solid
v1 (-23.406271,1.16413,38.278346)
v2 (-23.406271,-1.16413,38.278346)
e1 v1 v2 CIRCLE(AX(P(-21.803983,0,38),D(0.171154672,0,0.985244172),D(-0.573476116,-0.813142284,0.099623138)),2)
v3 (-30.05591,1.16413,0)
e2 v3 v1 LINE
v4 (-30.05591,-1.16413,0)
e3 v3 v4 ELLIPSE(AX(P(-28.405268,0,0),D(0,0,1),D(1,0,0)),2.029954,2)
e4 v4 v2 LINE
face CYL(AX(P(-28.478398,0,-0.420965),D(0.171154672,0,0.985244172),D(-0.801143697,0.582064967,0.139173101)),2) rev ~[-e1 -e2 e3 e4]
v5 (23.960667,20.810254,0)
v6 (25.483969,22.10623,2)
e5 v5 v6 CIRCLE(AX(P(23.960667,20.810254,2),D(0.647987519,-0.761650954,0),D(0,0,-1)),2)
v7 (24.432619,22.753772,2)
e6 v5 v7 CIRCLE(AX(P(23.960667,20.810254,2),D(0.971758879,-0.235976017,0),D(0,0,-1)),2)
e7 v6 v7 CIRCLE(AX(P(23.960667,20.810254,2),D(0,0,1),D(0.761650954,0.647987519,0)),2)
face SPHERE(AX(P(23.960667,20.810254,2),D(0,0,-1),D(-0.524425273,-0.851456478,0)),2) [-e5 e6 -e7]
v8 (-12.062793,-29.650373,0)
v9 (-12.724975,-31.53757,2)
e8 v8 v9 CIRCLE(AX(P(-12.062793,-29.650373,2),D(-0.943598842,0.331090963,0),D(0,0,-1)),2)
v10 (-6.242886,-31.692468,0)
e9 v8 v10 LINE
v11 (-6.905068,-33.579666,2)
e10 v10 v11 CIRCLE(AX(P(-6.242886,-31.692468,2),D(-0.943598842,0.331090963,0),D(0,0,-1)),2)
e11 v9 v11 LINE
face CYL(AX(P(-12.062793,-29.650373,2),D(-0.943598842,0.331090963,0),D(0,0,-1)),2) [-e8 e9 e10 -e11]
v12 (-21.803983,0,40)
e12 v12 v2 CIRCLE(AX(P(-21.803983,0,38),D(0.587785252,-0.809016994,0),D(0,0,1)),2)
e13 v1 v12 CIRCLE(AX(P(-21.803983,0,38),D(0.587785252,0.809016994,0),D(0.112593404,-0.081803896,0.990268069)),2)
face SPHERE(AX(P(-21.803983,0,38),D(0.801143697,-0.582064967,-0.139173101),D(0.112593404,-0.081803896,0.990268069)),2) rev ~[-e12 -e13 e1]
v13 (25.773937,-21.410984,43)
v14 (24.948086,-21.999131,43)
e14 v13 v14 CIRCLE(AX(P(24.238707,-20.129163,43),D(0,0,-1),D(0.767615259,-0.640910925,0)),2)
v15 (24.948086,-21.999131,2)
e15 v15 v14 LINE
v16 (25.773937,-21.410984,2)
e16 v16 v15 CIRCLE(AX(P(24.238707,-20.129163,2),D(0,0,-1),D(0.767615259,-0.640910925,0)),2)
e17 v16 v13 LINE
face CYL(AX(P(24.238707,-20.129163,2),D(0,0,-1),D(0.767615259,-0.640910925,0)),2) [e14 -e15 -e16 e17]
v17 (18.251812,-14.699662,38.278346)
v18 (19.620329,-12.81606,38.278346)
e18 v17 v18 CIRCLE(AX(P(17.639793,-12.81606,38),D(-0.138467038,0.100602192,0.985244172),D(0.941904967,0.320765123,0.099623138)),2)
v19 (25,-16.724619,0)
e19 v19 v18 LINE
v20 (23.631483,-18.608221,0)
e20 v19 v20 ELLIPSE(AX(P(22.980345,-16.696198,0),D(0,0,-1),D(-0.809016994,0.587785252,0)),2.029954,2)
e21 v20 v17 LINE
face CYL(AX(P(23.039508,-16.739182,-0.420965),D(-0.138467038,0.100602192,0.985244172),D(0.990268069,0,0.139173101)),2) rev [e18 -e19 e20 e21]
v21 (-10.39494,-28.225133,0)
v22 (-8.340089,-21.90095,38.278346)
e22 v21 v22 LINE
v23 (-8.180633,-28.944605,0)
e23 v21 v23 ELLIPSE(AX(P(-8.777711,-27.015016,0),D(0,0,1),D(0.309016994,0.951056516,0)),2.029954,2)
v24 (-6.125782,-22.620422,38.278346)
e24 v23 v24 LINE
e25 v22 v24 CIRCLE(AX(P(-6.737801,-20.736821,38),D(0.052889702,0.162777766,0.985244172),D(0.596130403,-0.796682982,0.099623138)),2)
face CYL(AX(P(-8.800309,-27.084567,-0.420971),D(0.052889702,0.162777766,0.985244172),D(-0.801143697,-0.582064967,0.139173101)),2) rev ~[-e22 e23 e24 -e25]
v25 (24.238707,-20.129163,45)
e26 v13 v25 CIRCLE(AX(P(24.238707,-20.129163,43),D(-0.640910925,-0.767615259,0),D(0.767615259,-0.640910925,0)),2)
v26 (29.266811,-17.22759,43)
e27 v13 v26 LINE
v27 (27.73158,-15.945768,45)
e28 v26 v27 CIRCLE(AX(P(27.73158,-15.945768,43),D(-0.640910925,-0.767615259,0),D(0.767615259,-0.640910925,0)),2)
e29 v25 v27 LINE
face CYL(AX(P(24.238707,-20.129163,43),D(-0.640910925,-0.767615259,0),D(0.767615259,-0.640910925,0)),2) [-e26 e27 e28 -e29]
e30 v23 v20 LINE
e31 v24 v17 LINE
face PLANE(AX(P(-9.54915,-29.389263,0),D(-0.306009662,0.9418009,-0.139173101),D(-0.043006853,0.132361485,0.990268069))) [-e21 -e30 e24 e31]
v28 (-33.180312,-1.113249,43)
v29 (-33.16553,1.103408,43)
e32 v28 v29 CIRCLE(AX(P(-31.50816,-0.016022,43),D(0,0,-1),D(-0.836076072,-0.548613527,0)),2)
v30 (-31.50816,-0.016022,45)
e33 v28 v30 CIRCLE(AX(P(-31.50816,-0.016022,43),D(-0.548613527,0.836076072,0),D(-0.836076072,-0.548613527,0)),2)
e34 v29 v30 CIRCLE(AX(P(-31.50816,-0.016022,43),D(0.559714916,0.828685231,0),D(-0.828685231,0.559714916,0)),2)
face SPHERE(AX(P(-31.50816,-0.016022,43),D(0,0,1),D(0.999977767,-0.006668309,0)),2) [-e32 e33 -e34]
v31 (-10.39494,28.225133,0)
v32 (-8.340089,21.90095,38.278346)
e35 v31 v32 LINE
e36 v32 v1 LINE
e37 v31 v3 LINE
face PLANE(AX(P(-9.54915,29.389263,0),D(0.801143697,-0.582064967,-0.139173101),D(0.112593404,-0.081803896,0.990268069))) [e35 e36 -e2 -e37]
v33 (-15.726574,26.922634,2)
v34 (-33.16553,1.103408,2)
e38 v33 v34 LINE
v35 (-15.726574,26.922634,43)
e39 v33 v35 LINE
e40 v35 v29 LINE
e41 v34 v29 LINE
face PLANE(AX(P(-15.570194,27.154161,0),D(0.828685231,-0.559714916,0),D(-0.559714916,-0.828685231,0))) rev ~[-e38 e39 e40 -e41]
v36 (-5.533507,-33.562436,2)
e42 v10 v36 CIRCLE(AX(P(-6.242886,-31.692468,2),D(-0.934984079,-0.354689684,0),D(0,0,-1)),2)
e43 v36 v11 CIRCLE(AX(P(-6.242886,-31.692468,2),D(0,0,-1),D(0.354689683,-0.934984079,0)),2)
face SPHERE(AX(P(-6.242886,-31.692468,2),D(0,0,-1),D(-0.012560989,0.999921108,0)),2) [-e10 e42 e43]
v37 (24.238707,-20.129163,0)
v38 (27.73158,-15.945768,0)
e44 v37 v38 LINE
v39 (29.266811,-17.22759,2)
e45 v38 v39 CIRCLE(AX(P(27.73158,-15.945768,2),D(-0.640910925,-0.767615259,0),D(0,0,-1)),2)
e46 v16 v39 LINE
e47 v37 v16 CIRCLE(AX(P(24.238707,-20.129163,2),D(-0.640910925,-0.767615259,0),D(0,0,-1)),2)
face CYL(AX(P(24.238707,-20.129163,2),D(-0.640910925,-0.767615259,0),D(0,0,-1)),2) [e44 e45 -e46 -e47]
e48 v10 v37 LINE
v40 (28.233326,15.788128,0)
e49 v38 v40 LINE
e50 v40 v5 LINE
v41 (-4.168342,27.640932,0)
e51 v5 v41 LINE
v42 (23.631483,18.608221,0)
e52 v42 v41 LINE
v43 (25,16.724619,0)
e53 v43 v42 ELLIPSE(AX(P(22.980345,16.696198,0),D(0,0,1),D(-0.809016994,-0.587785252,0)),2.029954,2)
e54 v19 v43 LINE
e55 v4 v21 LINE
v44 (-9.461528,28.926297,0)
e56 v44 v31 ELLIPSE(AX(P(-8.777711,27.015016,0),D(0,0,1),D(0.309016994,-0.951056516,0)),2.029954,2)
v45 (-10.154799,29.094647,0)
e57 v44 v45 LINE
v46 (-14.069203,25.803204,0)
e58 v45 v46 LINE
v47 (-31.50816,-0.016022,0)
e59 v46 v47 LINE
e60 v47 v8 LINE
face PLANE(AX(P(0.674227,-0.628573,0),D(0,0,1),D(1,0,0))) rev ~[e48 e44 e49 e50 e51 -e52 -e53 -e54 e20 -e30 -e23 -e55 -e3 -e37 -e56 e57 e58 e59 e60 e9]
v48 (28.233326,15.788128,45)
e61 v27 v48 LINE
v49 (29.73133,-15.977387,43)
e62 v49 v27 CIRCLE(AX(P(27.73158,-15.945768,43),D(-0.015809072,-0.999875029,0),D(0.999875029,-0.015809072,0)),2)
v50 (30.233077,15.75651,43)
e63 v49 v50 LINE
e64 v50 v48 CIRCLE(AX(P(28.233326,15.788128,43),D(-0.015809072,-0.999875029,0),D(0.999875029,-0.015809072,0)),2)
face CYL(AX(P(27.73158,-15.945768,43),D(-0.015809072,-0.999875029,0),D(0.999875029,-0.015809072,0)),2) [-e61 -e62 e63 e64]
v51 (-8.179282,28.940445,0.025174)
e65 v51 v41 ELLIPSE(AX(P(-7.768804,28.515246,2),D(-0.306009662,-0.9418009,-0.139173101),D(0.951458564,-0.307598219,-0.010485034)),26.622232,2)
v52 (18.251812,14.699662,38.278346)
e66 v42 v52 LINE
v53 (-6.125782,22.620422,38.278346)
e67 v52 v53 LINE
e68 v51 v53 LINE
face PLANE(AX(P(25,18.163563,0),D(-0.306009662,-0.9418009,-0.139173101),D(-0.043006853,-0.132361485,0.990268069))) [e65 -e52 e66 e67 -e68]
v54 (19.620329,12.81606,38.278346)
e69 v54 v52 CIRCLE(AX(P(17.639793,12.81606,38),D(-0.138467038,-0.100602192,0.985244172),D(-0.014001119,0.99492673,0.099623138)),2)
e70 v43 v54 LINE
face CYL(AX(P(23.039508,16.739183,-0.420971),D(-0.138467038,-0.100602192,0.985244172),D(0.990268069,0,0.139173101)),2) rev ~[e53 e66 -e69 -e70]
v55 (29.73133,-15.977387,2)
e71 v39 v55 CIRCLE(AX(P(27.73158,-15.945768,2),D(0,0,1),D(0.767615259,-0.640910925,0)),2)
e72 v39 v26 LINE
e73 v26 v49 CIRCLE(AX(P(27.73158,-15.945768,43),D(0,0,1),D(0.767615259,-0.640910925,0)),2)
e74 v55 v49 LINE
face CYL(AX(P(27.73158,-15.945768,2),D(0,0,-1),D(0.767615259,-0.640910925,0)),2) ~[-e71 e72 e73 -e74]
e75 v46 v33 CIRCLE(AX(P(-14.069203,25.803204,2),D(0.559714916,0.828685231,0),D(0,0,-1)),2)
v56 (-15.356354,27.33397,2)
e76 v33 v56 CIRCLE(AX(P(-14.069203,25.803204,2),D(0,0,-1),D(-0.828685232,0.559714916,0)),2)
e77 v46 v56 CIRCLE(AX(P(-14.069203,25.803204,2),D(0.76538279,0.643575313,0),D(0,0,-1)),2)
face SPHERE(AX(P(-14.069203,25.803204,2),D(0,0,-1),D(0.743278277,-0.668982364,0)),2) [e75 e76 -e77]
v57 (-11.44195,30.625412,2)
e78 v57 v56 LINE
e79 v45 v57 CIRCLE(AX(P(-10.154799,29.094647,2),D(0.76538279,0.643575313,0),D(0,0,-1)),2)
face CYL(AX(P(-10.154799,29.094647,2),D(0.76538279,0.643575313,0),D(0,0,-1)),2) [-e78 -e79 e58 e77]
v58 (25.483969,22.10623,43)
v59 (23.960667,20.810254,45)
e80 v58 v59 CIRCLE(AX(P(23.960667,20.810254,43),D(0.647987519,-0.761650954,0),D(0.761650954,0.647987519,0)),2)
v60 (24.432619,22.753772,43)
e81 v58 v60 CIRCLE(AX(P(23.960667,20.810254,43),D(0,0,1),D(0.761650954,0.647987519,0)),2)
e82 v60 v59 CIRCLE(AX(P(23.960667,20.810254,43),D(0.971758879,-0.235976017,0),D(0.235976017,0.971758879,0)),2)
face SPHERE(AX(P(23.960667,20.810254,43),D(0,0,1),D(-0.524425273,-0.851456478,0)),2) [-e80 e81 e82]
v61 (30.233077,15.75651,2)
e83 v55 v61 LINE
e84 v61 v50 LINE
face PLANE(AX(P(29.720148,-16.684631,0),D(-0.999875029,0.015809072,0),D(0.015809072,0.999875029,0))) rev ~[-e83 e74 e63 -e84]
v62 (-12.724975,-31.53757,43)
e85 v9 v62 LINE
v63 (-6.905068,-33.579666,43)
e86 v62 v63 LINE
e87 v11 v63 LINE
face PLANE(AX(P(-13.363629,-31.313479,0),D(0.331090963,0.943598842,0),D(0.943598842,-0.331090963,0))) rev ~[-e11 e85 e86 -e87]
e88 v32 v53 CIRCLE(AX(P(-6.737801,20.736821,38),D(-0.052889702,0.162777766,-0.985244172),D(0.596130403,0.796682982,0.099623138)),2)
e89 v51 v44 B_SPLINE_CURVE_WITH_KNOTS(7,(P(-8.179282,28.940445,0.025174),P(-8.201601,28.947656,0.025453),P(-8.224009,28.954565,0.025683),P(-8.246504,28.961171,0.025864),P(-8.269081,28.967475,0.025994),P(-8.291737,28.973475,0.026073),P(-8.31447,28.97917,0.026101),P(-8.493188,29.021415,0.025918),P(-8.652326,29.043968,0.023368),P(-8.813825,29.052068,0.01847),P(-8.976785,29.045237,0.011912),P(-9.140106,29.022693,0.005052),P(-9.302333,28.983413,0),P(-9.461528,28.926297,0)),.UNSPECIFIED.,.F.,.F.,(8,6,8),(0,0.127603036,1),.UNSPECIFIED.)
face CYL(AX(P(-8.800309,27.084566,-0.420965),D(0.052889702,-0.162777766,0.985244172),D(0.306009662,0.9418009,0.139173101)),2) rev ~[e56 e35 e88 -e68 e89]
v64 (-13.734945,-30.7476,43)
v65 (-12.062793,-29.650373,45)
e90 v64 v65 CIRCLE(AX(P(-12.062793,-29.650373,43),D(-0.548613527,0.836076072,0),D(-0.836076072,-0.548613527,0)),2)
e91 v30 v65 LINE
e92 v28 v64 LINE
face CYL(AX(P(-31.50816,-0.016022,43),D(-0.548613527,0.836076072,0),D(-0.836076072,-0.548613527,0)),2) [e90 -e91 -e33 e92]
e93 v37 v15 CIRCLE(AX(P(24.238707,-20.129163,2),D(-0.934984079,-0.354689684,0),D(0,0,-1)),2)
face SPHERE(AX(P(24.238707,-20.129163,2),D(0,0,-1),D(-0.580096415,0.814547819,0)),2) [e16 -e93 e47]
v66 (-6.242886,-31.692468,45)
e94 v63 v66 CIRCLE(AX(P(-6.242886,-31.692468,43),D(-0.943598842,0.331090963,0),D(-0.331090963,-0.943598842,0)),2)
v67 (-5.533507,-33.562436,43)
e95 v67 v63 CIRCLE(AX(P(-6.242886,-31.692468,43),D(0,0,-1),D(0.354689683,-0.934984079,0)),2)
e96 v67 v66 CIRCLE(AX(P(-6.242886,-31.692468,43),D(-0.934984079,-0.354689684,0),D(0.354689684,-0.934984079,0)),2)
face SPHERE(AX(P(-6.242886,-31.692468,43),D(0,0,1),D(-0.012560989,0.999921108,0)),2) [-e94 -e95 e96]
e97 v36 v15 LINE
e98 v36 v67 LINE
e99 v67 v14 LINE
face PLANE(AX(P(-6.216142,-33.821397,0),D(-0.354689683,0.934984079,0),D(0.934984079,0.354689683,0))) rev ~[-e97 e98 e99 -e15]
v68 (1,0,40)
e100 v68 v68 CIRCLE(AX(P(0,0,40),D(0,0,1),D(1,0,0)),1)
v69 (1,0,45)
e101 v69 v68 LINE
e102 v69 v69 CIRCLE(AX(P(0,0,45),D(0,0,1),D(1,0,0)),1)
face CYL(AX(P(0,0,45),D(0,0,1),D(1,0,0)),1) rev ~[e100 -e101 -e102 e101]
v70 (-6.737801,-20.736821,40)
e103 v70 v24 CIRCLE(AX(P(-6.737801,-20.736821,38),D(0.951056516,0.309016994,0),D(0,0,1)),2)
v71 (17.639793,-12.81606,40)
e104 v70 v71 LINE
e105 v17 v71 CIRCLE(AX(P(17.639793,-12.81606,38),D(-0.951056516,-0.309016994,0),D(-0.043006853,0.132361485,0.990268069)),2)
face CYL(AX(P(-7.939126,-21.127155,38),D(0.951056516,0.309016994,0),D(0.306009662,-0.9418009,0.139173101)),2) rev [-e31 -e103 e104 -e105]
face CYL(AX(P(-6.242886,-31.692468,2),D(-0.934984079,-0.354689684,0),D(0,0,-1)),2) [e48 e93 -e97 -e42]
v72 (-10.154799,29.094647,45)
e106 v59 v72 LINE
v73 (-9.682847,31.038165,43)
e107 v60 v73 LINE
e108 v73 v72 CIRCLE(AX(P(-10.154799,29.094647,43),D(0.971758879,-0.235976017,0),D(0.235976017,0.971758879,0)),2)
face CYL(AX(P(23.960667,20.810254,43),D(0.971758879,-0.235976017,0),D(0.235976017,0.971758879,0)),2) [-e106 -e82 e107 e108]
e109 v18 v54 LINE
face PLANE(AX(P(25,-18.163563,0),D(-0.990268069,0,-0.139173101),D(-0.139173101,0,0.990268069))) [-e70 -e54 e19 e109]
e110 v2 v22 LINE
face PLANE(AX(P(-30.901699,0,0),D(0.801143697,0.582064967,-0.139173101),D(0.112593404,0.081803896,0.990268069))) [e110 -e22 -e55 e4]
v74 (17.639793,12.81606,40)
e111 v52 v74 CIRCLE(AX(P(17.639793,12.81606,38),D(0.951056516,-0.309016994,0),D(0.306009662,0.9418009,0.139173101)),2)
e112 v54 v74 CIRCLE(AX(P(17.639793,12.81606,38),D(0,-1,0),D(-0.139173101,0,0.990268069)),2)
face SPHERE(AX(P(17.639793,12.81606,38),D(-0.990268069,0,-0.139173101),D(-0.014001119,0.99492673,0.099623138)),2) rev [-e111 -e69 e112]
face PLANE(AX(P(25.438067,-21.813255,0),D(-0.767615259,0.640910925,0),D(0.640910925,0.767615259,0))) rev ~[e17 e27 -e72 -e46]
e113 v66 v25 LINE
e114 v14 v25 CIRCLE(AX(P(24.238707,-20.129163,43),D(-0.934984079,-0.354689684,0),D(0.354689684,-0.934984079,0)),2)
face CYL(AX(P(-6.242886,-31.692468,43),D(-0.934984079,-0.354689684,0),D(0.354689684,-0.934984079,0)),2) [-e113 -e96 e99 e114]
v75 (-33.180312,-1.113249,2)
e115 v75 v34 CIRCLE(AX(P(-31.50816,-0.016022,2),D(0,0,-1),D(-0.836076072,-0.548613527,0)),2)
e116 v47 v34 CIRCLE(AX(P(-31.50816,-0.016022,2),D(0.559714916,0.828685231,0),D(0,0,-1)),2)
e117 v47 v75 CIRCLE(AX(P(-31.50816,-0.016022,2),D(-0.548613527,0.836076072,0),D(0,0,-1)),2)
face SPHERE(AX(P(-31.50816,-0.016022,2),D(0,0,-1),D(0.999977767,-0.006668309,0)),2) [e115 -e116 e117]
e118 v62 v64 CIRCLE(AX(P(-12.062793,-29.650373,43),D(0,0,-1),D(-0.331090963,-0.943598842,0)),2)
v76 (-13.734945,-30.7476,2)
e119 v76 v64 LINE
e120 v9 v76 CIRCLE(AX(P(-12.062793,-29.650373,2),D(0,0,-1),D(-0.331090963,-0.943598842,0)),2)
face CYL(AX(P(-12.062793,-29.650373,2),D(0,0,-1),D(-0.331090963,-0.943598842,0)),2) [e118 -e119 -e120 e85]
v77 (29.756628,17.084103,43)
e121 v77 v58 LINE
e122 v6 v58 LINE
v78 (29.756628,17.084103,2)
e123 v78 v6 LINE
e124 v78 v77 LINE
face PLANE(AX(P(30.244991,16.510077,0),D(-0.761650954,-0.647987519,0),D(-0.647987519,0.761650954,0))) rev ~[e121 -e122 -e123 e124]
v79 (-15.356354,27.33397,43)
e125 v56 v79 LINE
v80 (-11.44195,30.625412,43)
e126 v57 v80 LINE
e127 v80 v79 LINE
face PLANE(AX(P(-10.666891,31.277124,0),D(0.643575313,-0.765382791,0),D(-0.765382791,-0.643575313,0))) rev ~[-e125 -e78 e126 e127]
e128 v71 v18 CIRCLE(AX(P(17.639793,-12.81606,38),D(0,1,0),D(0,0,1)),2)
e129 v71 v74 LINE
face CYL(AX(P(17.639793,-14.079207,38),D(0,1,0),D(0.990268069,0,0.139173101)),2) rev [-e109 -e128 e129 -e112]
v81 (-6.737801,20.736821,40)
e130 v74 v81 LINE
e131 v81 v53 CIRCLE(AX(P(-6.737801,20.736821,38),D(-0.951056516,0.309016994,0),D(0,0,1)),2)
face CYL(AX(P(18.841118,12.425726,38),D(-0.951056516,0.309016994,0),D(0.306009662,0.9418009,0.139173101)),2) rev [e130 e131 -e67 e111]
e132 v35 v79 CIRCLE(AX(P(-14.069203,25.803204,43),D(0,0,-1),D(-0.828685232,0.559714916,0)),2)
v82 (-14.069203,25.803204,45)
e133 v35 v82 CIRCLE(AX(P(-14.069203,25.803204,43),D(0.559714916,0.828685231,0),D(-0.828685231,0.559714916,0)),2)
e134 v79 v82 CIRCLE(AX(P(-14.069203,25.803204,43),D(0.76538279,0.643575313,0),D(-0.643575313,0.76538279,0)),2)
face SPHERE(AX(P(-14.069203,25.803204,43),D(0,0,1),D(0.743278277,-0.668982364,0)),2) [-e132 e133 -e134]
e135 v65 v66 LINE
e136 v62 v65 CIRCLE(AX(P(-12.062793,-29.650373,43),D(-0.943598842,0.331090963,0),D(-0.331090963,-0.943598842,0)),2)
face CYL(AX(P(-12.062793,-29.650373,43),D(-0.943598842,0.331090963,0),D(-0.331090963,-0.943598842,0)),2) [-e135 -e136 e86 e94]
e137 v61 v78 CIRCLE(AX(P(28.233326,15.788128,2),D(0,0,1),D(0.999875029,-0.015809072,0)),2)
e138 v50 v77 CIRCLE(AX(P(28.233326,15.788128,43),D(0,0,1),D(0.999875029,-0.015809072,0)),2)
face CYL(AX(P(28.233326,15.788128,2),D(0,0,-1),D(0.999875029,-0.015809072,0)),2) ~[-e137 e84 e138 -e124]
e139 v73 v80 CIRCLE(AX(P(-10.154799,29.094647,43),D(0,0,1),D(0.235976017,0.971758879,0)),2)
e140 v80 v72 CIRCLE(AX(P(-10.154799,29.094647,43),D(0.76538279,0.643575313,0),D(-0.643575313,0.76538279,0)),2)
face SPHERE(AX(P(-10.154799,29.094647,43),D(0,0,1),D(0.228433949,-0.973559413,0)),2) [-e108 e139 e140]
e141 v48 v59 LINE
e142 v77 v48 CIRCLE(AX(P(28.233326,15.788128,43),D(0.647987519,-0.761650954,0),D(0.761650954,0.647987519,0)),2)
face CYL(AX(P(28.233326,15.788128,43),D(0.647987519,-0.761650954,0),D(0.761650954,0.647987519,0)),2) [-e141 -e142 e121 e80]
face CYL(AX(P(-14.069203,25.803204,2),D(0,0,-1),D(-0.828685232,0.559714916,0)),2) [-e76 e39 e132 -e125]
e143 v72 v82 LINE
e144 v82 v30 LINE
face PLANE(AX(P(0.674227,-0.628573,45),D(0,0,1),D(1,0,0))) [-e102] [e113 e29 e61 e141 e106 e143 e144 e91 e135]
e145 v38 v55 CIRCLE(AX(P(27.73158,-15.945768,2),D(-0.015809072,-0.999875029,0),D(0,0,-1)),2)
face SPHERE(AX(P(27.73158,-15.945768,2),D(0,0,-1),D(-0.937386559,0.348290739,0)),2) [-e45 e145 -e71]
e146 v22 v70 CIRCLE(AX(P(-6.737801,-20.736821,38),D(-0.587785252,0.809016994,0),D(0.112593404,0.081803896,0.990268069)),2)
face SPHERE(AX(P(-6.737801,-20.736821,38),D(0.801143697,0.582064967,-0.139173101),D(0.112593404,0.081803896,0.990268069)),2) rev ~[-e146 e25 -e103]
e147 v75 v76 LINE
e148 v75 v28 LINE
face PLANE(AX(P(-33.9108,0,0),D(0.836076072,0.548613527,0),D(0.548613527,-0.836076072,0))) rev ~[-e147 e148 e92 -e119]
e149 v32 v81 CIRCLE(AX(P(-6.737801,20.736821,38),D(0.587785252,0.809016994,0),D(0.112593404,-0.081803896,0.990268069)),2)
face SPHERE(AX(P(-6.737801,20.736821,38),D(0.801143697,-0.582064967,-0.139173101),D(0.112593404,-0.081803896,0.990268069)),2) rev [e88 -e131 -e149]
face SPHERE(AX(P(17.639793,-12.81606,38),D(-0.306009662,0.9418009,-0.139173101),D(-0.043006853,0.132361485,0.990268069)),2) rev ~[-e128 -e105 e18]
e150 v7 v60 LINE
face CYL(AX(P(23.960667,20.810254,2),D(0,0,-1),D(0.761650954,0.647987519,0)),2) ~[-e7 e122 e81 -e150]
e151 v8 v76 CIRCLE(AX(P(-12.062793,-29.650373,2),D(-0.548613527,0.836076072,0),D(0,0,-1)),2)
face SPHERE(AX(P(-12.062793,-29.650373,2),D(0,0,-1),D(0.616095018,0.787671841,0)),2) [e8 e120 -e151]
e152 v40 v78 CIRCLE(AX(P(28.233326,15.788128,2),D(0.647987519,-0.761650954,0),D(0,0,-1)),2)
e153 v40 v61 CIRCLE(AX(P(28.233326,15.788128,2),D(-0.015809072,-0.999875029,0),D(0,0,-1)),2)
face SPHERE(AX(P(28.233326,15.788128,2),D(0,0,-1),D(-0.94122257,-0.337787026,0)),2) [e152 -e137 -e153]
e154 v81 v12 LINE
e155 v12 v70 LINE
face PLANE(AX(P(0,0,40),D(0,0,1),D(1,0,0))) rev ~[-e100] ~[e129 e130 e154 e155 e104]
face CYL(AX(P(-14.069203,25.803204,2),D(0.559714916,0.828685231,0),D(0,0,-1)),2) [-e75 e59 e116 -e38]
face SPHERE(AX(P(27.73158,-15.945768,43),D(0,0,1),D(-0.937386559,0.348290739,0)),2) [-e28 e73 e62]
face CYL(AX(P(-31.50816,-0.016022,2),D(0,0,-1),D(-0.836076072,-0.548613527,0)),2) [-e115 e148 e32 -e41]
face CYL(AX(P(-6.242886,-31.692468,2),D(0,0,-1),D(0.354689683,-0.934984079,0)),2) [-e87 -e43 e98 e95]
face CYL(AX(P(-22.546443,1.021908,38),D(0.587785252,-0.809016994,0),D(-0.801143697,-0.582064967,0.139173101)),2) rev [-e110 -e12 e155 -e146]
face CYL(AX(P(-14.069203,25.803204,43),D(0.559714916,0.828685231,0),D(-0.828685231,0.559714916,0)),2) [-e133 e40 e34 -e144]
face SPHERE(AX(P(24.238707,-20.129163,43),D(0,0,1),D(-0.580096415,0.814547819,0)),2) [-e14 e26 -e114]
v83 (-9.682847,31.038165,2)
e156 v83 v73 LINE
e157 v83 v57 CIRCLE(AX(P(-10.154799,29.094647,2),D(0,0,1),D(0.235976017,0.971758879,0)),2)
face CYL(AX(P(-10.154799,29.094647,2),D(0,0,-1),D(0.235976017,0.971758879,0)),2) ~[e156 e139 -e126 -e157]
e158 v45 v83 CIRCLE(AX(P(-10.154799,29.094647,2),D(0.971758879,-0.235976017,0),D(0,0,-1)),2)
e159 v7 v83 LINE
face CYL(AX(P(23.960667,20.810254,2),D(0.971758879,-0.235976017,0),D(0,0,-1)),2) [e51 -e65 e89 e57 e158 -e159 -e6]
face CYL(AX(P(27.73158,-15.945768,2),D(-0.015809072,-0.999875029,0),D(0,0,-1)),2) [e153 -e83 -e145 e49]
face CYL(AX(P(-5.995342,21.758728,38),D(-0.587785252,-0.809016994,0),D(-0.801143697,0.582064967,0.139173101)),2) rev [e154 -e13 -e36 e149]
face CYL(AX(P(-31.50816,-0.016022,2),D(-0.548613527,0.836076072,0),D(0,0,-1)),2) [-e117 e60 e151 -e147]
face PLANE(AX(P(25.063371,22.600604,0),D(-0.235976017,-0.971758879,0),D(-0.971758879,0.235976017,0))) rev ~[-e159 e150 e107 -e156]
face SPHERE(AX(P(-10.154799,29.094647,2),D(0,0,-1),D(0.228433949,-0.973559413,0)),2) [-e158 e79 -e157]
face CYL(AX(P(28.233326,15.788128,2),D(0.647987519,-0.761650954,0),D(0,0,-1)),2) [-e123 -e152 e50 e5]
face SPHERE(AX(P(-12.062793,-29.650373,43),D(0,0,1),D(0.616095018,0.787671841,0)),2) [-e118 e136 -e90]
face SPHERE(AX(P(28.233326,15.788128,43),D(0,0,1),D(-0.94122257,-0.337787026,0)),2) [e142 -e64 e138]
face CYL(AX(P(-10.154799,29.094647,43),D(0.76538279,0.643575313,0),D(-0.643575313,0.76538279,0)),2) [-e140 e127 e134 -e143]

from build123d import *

# Parameters (mm, degrees)
F1_DEPTH      = 45
F3_DEPTH      = 40
F3_TAPER      = 8
F4_R          = 2
F5_T1_DEPTH   = 41
F5_T3_DEPTH   = 35.1069251356
F5_T5_DEPTH   = 6.5937371539
F5_T7_DEPTH   = 31.737863034
F5_T9_DEPTH   = 5.4498579355
F5_T11_DEPTH  = 32.6011890019
F5_T13_DEPTH  = 6.1677770557
F5_T15_DEPTH  = 35.4445627494
F5_T17_DEPTH  = 31.1568553356
F5_T19_DEPTH  = 5.1143087809
F5_T24_DEPTH  = 2
F5_T30_DEPTH  = 2
F5_T36_DEPTH  = 2
F5_T42_DEPTH  = 2
F5_T48_DEPTH  = 2
F5_T54_DEPTH  = 2
F5_T60_DEPTH  = 2
F5_T66_DEPTH  = 2
F5_T72_DEPTH  = 2
F5_T78_DEPTH  = 2
F5_T84_DEPTH  = 2
F5_T90_DEPTH  = 2
F5_T96_DEPTH  = 2
F5_T102_DEPTH = 2
F5_T108_DEPTH = 2
F5_T114_DEPTH = 2
F5_T120_DEPTH = 2
F5_T126_DEPTH = 2
F6_R          = 1
F7_DEPTH      = 45.0010001


# Not quite as in the source:
# - a fillet or chamfer that OpenCascade refuses, or shapes differently, is made with other operations: its cross-section is extruded or revolved along the edge and cut away or added


with BuildPart() as f1:
    # F0 (on Top) → F1 (new body)
    with BuildSketch(Plane.XY):
        Polygon((29.7201480716, -16.6846308857), (30.2449911833, 16.5100768209), (25.0633712858, 22.6006042212), (-10.6668910012, 31.2771238387), (-15.5701944605, 27.1541606635), (-33.9107997715, 0), (-13.3636286482, -31.3134789467), (-6.2161423266, -33.8213965297), (25.438066572, -21.8132548034), align=None)
    extrude(amount=F1_DEPTH)

    # F2 (on Top) → F3 (cut)
    with BuildSketch(Plane.XY):
        Polygon((25, -18.1635632001), (25, 18.1635632001), (-9.5491502813, 29.3892626146), (-30.9016994375, 0), (-9.5491502813, -29.3892626146), align=None)
    extrude(amount=F3_DEPTH, taper=F3_TAPER, mode=Mode.SUBTRACT)

    # F4
    f4_edges = [f1.edges().sort_by_distance(p)[0] for p in [
        (5.988245, 18.429922, 40),
        (22.189183, 16.121385, 20),
        (19.378367, 0, 40),
        (5.988245, -18.429922, 40),
        (-15.677428, -11.390318, 40),
        (-15.677428, 11.390318, 40),
        (-8.475514, 26.084949, 20.000003),
        (-27.427338, 0, 20.000003),
        (-8.475514, -26.084949, 20),
        (22.189183, -16.121385, 20.000003),
    ]]
    fillet(f4_edges, radius=F4_R)

    # F5: fillet of radius 2 on 27 edges, made by hand

    # F5_s2 → F5_t1 (cut)
    with BuildSketch(Plane.XY.offset(2)):
        with BuildLine():
            ThreePointArc((25.4839689775, 22.1062295244), (25.0095176152, 22.5131674422), (24.4326191036, 22.7537722455))
            Line((24.4326191036, 22.7537722455), (25.0633712858, 22.6006042212))
            Line((25.0633712858, 22.6006042212), (25.4839689775, 22.1062295244))
        make_face()
        with BuildLine():
            ThreePointArc((-9.6828471205, 31.0381646067), (-10.6116670526, 31.0417656744), (-11.4419497811, 30.6254124292))
            Line((-11.4419497811, 30.6254124292), (-10.6668910012, 31.2771238387))
            Line((-10.6668910012, 31.2771238387), (-9.6828471205, 31.0381646067))
        make_face()
        with BuildLine():
            ThreePointArc((30.2330765046, 15.75651015), (30.115771586, 16.4637023449), (29.7566283548, 17.0841033313))
            Line((29.7566283548, 17.0841033313), (30.2449911833, 16.5100768209))
            Line((30.2449911833, 16.5100768209), (30.2330765046, 15.75651015))
        make_face()
        with BuildLine():
            ThreePointArc((29.266810806, -17.2275902721), (29.606353406, -16.6423498995), (29.7313303454, -15.9773865656))
            Line((29.7313303454, -15.9773865656), (29.7201480716, -16.6846308857))
            Line((29.7201480716, -16.6846308857), (29.266810806, -17.2275902721))
        make_face()
        with BuildLine():
            ThreePointArc((25.7739373145, -21.4109843833), (25.3988996269, -21.7582581704), (24.9480861633, -21.9991306915))
            Line((24.9480861633, -21.9991306915), (25.438066572, -21.8132548034))
            Line((25.438066572, -21.8132548034), (25.7739373145, -21.4109843833))
        make_face()
        with BuildLine():
            ThreePointArc((-5.5335065177, -33.5624360999), (-6.217763907, -33.6923101567), (-6.90506781, -33.5796656252))
            Line((-6.90506781, -33.5796656252), (-6.2161423266, -33.8213965297))
            Line((-6.2161423266, -33.8213965297), (-5.5335065177, -33.5624360999))
        make_face()
        with BuildLine():
            ThreePointArc((-12.7249750969, -31.5375703823), (-13.294983208, -31.2257163798), (-13.7349453155, -30.7475997522))
            Line((-13.7349453155, -30.7475997522), (-13.3636286482, -31.3134789467))
            Line((-13.3636286482, -31.3134789467), (-12.7249750969, -31.5375703823))
        make_face()
        with BuildLine():
            ThreePointArc((-33.1803118935, -1.1132489554), (-33.5081152827, -0.0026852842), (-33.1655302123, 1.1034079304))
            Line((-33.1655302123, 1.1034079304), (-33.9107997715, 0))
            Line((-33.9107997715, 0), (-33.1803118935, -1.1132489554))
        make_face()
        with BuildLine():
            ThreePointArc((-15.7265735436, 26.922633804), (-15.5557596342, 27.1411687), (-15.3563537075, 27.3339695529))
            Line((-15.3563537075, 27.3339695529), (-15.5701944605, 27.1541606635))
            Line((-15.5701944605, 27.1541606635), (-15.7265735436, 26.922633804))
        make_face()
    extrude(amount=F5_T1_DEPTH, mode=Mode.SUBTRACT)

    # F5_s4 → F5_t3 (cut)
    with BuildSketch(Plane(origin=(17.8543882754, -4.335651076, 0), x_dir=(0, 0, 1), z_dir=(-0.9717588793, 0.235976017, 0))):
        with BuildLine():
            ThreePointArc((0, 25.8766923562), (0.5857864376, 27.2909059185), (2, 27.8766923562))
            Line((2, 27.8766923562), (0, 27.8766923562))
            Line((0, 27.8766923562), (0, 25.8766923562))
        make_face()
        with BuildLine():
            ThreePointArc((43, 27.8766923562), (44.4142135624, 27.2909059185), (45, 25.8766923562))
            Line((45, 25.8766923562), (45, 27.8766923562))
            Line((45, 27.8766923562), (43, 27.8766923562))
        make_face()
    extrude(amount=F5_T3_DEPTH, mode=Mode.SUBTRACT)

    # F5_s6 → F5_t5 (cut)
    with BuildSketch(Plane(origin=(4.0627522572, -4.775399283, 0), x_dir=(0, 0, 1), z_dir=(-0.6479875187, 0.7616509539, 0))):
        with BuildLine():
            ThreePointArc((0, 31.7344500987), (0.5857864376, 33.1486636611), (2, 33.7344500987))
            Line((2, 33.7344500987), (0, 33.7344500987))
            Line((0, 33.7344500987), (0, 31.7344500987))
        make_face()
        with BuildLine():
            ThreePointArc((43, 33.7344500987), (44.4142135624, 33.1486636611), (45, 31.7344500987))
            Line((45, 31.7344500987), (45, 33.7344500987))
            Line((45, 33.7344500987), (43, 33.7344500987))
        make_face()
    extrude(amount=F5_T5_DEPTH, mode=Mode.SUBTRACT)

    # F5_s8 → F5_t7 (cut)
    with BuildSketch(Plane(origin=(-0.2451254322, -15.5034273892, 0), x_dir=(0, 0, 1), z_dir=(0.0158090719, 0.9998750288, 0))):
        with BuildLine():
            ThreePointArc((0, 27.9802024391), (0.5857864376, 29.3944160014), (2, 29.9802024391))
            Line((2, 29.9802024391), (0, 29.9802024391))
            Line((0, 29.9802024391), (0, 27.9802024391))
        make_face()
        with BuildLine():
            ThreePointArc((43, 29.9802024391), (44.4142135624, 29.3944160014), (45, 27.9802024391))
            Line((45, 27.9802024391), (45, 29.9802024391))
            Line((45, 29.9802024391), (43, 29.9802024391))
        make_face()
    extrude(amount=F5_T7_DEPTH, mode=Mode.SUBTRACT)

    # F5_s10 → F5_t9 (cut)
    with BuildSketch(Plane(origin=(0.0534517688, 0.0640188702, 0), x_dir=(0, 0, 1), z_dir=(0.6409109252, 0.7676152591, 0))):
        with BuildLine():
            ThreePointArc((0, 31.5070013796), (0.5857864376, 32.9212149419), (2, 33.5070013796))
            Line((2, 33.5070013796), (0, 33.5070013796))
            Line((0, 33.5070013796), (0, 31.5070013796))
        make_face()
        with BuildLine():
            ThreePointArc((43, 33.5070013796), (44.4142135624, 32.9212149419), (45, 31.5070013796))
            Line((45, 31.5070013796), (45, 33.5070013796))
            Line((45, 33.5070013796), (43, 33.5070013796))
        make_face()
    extrude(amount=F5_T9_DEPTH, mode=Mode.SUBTRACT)

    # F5_s12 → F5_t11 (cut)
    with BuildSketch(Plane(origin=(-15.9676490674, -6.0573869861, 0), x_dir=(0, 0, 1), z_dir=(0.9349840792, 0.3546896835, 0))):
        with BuildLine():
            ThreePointArc((0, 27.4176657385), (0.5857864376, 28.8318793009), (2, 29.4176657385))
            Line((2, 29.4176657385), (0, 29.4176657385))
            Line((0, 29.4176657385), (0, 27.4176657385))
        make_face()
        with BuildLine():
            ThreePointArc((43, 29.4176657385), (44.4142135624, 28.8318793009), (45, 27.4176657385))
            Line((45, 27.4176657385), (45, 29.4176657385))
            Line((45, 29.4176657385), (43, 29.4176657385))
        make_face()
    extrude(amount=F5_T11_DEPTH, mode=Mode.SUBTRACT)

    # F5_s14 → F5_t13 (cut)
    with BuildSketch(Plane(origin=(-1.477173062, 0.5183120511, 0), x_dir=(0, 0, 1), z_dir=(0.9435988419, -0.3310909627, 0))):
        with BuildLine():
            ThreePointArc((0, 31.9719391439), (0.5857864376, 33.3861527063), (2, 33.9719391439))
            Line((2, 33.9719391439), (0, 33.9719391439))
            Line((0, 33.9719391439), (0, 31.9719391439))
        make_face()
        with BuildLine():
            ThreePointArc((43, 33.9719391439), (44.4142135624, 33.3861527063), (45, 31.9719391439))
            Line((45, 31.9719391439), (45, 33.9719391439))
            Line((45, 33.9719391439), (43, 33.9719391439))
        make_face()
    extrude(amount=F5_T13_DEPTH, mode=Mode.SUBTRACT)

    # F5_s16 → F5_t15 (cut)
    with BuildSketch(Plane(origin=(-9.4758761855, 14.4410462956, 0), x_dir=(0, 0, 1), z_dir=(0.5486135269, -0.836076072, 0))):
        with BuildLine():
            ThreePointArc((0, 26.3520082709), (0.5857864376, 27.7662218332), (2, 28.3520082709))
            Line((2, 28.3520082709), (0, 28.3520082709))
            Line((0, 28.3520082709), (0, 26.3520082709))
        make_face()
        with BuildLine():
            ThreePointArc((43, 28.3520082709), (44.4142135624, 27.7662218332), (45, 26.3520082709))
            Line((45, 26.3520082709), (45, 28.3520082709))
            Line((45, 28.3520082709), (43, 28.3520082709))
        make_face()
    extrude(amount=F5_T15_DEPTH, mode=Mode.SUBTRACT)

    # F5_s18 → F5_t17 (cut)
    with BuildSketch(Plane(origin=(7.5606241791, 11.1938728407, 0), x_dir=(0, 0, 1), z_dir=(-0.5597149161, -0.8286852314, 0))):
        with BuildLine():
            ThreePointArc((0, 26.1013789558), (0.5857864376, 27.5155925181), (2, 28.1013789558))
            Line((2, 28.1013789558), (0, 28.1013789558))
            Line((0, 28.1013789558), (0, 26.1013789558))
        make_face()
        with BuildLine():
            ThreePointArc((43, 28.1013789558), (44.4142135624, 27.5155925181), (45, 26.1013789558))
            Line((45, 26.1013789558), (45, 28.1013789558))
            Line((45, 28.1013789558), (43, 28.1013789558))
        make_face()
    extrude(amount=F5_T17_DEPTH, mode=Mode.SUBTRACT)

    # F5_s20 → F5_t19 (cut)
    with BuildSketch(Plane(origin=(8.3826927124, 7.0486221481, 0), x_dir=(0, 0, 1), z_dir=(-0.7653827905, -0.6435753134, 0))):
        with BuildLine():
            ThreePointArc((0, 28.803920042), (0.5857864376, 30.2181336044), (2, 30.803920042))
            Line((2, 30.803920042), (0, 30.803920042))
            Line((0, 30.803920042), (0, 28.803920042))
        make_face()
        with BuildLine():
            ThreePointArc((43, 30.803920042), (44.4142135624, 30.2181336044), (45, 28.803920042))
            Line((45, 28.803920042), (45, 30.803920042))
            Line((45, 30.803920042), (43, 30.803920042))
        make_face()
    extrude(amount=F5_T19_DEPTH, mode=Mode.SUBTRACT)


with BuildPart() as f5_tool22:
    # F5_s23 → F5_t24 (new body)
    with BuildSketch(Plane.XY.offset(2)):
        Polygon((23.9606670696, 20.810254487), (24.4326191036, 22.7537722455), (25.0633712858, 22.6006042212), (25.4839689775, 22.1062295244), align=None)
    extrude(amount=-F5_T24_DEPTH)

    # F5_s25 → F5_t26 (revolve, cut)
    with BuildSketch(Plane(origin=(23.9606670696, 20.810254487, 2), x_dir=(-0.5244252728, -0.8514564776, 0), z_dir=(0.8514564776, -0.5244252728, 0))):
        with BuildLine():
            ThreePointArc((0, -2), (2, 0), (0, 2))
            Line((0, 2), (0, -2))
        make_face()
    revolve(axis=Axis((23.9606670696, 20.810254487, 2), (0, 0, -1)), mode=Mode.SUBTRACT)


with BuildPart() as f1_1:
    add(f1.part)

    # F5_t21: cut F5_tool22
    add(f5_tool22.part, mode=Mode.SUBTRACT)


with BuildPart() as f5_tool28:
    # F5_s29 → F5_t30 (new body)
    with BuildSketch(Plane.XY.offset(43)):
        Polygon((23.9606670696, 20.810254487), (25.4839689775, 22.1062295244), (25.0633712858, 22.6006042212), (24.4326191036, 22.7537722455), align=None)
    extrude(amount=F5_T30_DEPTH)

    # F5_s31 → F5_t32 (revolve, cut)
    with BuildSketch(Plane(origin=(23.9606670696, 20.810254487, 43), x_dir=(-0.5244252728, -0.8514564776, 0), z_dir=(-0.8514564776, 0.5244252728, 0))):
        with BuildLine():
            ThreePointArc((0, -2), (2, 0), (0, 2))
            Line((0, 2), (0, -2))
        make_face()
    revolve(axis=Axis((23.9606670696, 20.810254487, 43), (0, 0, 1)), mode=Mode.SUBTRACT)


with BuildPart() as f1_2:
    add(f1_1.part)

    # F5_t27: cut F5_tool28
    add(f5_tool28.part, mode=Mode.SUBTRACT)


with BuildPart() as f5_tool34:
    # F5_s35 → F5_t36 (new body)
    with BuildSketch(Plane.XY.offset(2)):
        Polygon((-10.1547991544, 29.0946468482), (-9.6828471205, 31.0381646067), (-10.6668910012, 31.2771238387), (-11.4419497811, 30.6254124292), align=None)
    extrude(amount=-F5_T36_DEPTH)

    # F5_s37 → F5_t38 (revolve, cut)
    with BuildSketch(Plane(origin=(-10.1547991544, 29.0946468482, 2), x_dir=(0.2284339491, -0.9735594131, 0), z_dir=(0.9735594131, 0.2284339491, 0))):
        with BuildLine():
            ThreePointArc((0, -2), (2, 0), (0, 2))
            Line((0, 2), (0, -2))
        make_face()
    revolve(axis=Axis((-10.1547991544, 29.0946468482, 2), (0, 0, -1)), mode=Mode.SUBTRACT)


with BuildPart() as f1_3:
    add(f1_2.part)

    # F5_t33: cut F5_tool34
    add(f5_tool34.part, mode=Mode.SUBTRACT)


with BuildPart() as f5_tool40:
    # F5_s41 → F5_t42 (new body)
    with BuildSketch(Plane.XY.offset(43)):
        Polygon((-10.1547991544, 29.0946468482), (-9.6828471205, 31.0381646067), (-10.6668910012, 31.2771238387), (-11.4419497811, 30.6254124292), align=None)
    extrude(amount=F5_T42_DEPTH)

    # F5_s43 → F5_t44 (revolve, cut)
    with BuildSketch(Plane(origin=(-10.1547991544, 29.0946468482, 43), x_dir=(0.2284339491, -0.9735594131, 0), z_dir=(-0.9735594131, -0.2284339491, 0))):
        with BuildLine():
            ThreePointArc((0, -2), (2, 0), (0, 2))
            Line((0, 2), (0, -2))
        make_face()
    revolve(axis=Axis((-10.1547991544, 29.0946468482, 43), (0, 0, 1)), mode=Mode.SUBTRACT)


with BuildPart() as f1_4:
    add(f1_3.part)

    # F5_t39: cut F5_tool40
    add(f5_tool40.part, mode=Mode.SUBTRACT)


with BuildPart() as f5_tool46:
    # F5_s47 → F5_t48 (new body)
    with BuildSketch(Plane.XY.offset(2)):
        Polygon((28.233326447, 15.7881282939), (30.2330765046, 15.75651015), (30.2449911833, 16.5100768209), (29.7566283548, 17.0841033313), align=None)
    extrude(amount=-F5_T48_DEPTH)

    # F5_s49 → F5_t50 (revolve, cut)
    with BuildSketch(Plane(origin=(28.233326447, 15.7881282939, 2), x_dir=(-0.9412225695, -0.3377870255, 0), z_dir=(0.3377870255, -0.9412225695, 0))):
        with BuildLine():
            ThreePointArc((0, -2), (2, 0), (0, 2))
            Line((0, 2), (0, -2))
        make_face()
    revolve(axis=Axis((28.233326447, 15.7881282939, 2), (0, 0, -1)), mode=Mode.SUBTRACT)


with BuildPart() as f1_5:
    add(f1_4.part)

    # F5_t45: cut F5_tool46
    add(f5_tool46.part, mode=Mode.SUBTRACT)


with BuildPart() as f5_tool52:
    # F5_s53 → F5_t54 (new body)
    with BuildSketch(Plane.XY.offset(43)):
        Polygon((28.233326447, 15.7881282939), (29.7566283548, 17.0841033313), (30.2449911833, 16.5100768209), (30.2330765046, 15.75651015), align=None)
    extrude(amount=F5_T54_DEPTH)

    # F5_s55 → F5_t56 (revolve, cut)
    with BuildSketch(Plane(origin=(28.233326447, 15.7881282939, 43), x_dir=(-0.9412225695, -0.3377870255, 0), z_dir=(-0.3377870255, 0.9412225695, 0))):
        with BuildLine():
            ThreePointArc((0, -2), (2, 0), (0, 2))
            Line((0, 2), (0, -2))
        make_face()
    revolve(axis=Axis((28.233326447, 15.7881282939, 43), (0, 0, 1)), mode=Mode.SUBTRACT)


with BuildPart() as f1_6:
    add(f1_5.part)

    # F5_t51: cut F5_tool52
    add(f5_tool52.part, mode=Mode.SUBTRACT)


with BuildPart() as f5_tool58:
    # F5_s59 → F5_t60 (new body)
    with BuildSketch(Plane.XY.offset(2)):
        Polygon((27.7315802878, -15.9457684217), (29.266810806, -17.2275902721), (29.7201480716, -16.6846308857), (29.7313303454, -15.9773865656), align=None)
    extrude(amount=-F5_T60_DEPTH)

    # F5_s61 → F5_t62 (revolve, cut)
    with BuildSketch(Plane(origin=(27.7315802878, -15.9457684217, 2), x_dir=(-0.9373865591, 0.3482907389, 0), z_dir=(-0.3482907389, -0.9373865591, 0))):
        with BuildLine():
            ThreePointArc((0, -2), (2, 0), (0, 2))
            Line((0, 2), (0, -2))
        make_face()
    revolve(axis=Axis((27.7315802878, -15.9457684217, 2), (0, 0, -1)), mode=Mode.SUBTRACT)


with BuildPart() as f1_7:
    add(f1_6.part)

    # F5_t57: cut F5_tool58
    add(f5_tool58.part, mode=Mode.SUBTRACT)


with BuildPart() as f5_tool64:
    # F5_s65 → F5_t66 (new body)
    with BuildSketch(Plane.XY.offset(43)):
        Polygon((27.7315802878, -15.9457684217), (29.266810806, -17.2275902721), (29.7201480716, -16.6846308857), (29.7313303454, -15.9773865656), align=None)
    extrude(amount=F5_T66_DEPTH)

    # F5_s67 → F5_t68 (revolve, cut)
    with BuildSketch(Plane(origin=(27.7315802878, -15.9457684217, 43), x_dir=(-0.9373865591, 0.3482907389, 0), z_dir=(0.3482907389, 0.9373865591, 0))):
        with BuildLine():
            ThreePointArc((0, -2), (2, 0), (0, 2))
            Line((0, 2), (0, -2))
        make_face()
    revolve(axis=Axis((27.7315802878, -15.9457684217, 43), (0, 0, 1)), mode=Mode.SUBTRACT)


with BuildPart() as f1_8:
    add(f1_7.part)

    # F5_t63: cut F5_tool64
    add(f5_tool64.part, mode=Mode.SUBTRACT)


with BuildPart() as f5_tool70:
    # F5_s71 → F5_t72 (new body)
    with BuildSketch(Plane.XY.offset(2)):
        Polygon((24.2387067963, -20.129162533), (25.7739373145, -21.4109843833), (25.438066572, -21.8132548034), (24.9480861633, -21.9991306915), align=None)
    extrude(amount=-F5_T72_DEPTH)

    # F5_s73 → F5_t74 (revolve, cut)
    with BuildSketch(Plane(origin=(24.2387067963, -20.129162533, 2), x_dir=(-0.5800964153, 0.8145478187, 0), z_dir=(-0.8145478187, -0.5800964153, 0))):
        with BuildLine():
            ThreePointArc((0, -2), (2, 0), (0, 2))
            Line((0, 2), (0, -2))
        make_face()
    revolve(axis=Axis((24.2387067963, -20.129162533, 2), (0, 0, -1)), mode=Mode.SUBTRACT)


with BuildPart() as f1_9:
    add(f1_8.part)

    # F5_t69: cut F5_tool70
    add(f5_tool70.part, mode=Mode.SUBTRACT)


with BuildPart() as f5_tool76:
    # F5_s77 → F5_t78 (new body)
    with BuildSketch(Plane.XY.offset(43)):
        Polygon((24.2387067963, -20.129162533), (25.7739373145, -21.4109843833), (25.438066572, -21.8132548034), (24.9480861633, -21.9991306915), align=None)
    extrude(amount=F5_T78_DEPTH)

    # F5_s79 → F5_t80 (revolve, cut)
    with BuildSketch(Plane(origin=(24.2387067963, -20.129162533, 43), x_dir=(-0.5800964153, 0.8145478187, 0), z_dir=(0.8145478187, 0.5800964153, 0))):
        with BuildLine():
            ThreePointArc((0, -2), (2, 0), (0, 2))
            Line((0, 2), (0, -2))
        make_face()
    revolve(axis=Axis((24.2387067963, -20.129162533, 43), (0, 0, 1)), mode=Mode.SUBTRACT)


with BuildPart() as f1_10:
    add(f1_9.part)

    # F5_t75: cut F5_tool76
    add(f5_tool76.part, mode=Mode.SUBTRACT)


with BuildPart() as f5_tool82:
    # F5_s83 → F5_t84 (new body)
    with BuildSketch(Plane.XY.offset(2)):
        Polygon((-6.2428858846, -31.6924679414), (-5.5335065177, -33.5624360999), (-6.2161423266, -33.8213965297), (-6.90506781, -33.5796656252), align=None)
    extrude(amount=-F5_T84_DEPTH)

    # F5_s85 → F5_t86 (revolve, cut)
    with BuildSketch(Plane(origin=(-6.2428858846, -31.6924679414, 2), x_dir=(-0.0125609888, 0.9999211077, 0), z_dir=(-0.9999211077, -0.0125609888, 0))):
        with BuildLine():
            ThreePointArc((0, -2), (2, 0), (0, 2))
            Line((0, 2), (0, -2))
        make_face()
    revolve(axis=Axis((-6.2428858846, -31.6924679414, 2), (0, 0, -1)), mode=Mode.SUBTRACT)


with BuildPart() as f1_11:
    add(f1_10.part)

    # F5_t81: cut F5_tool82
    add(f5_tool82.part, mode=Mode.SUBTRACT)


with BuildPart() as f5_tool88:
    # F5_s89 → F5_t90 (new body)
    with BuildSketch(Plane.XY.offset(43)):
        Polygon((-6.2428858846, -31.6924679414), (-5.5335065177, -33.5624360999), (-6.2161423266, -33.8213965297), (-6.90506781, -33.5796656252), align=None)
    extrude(amount=F5_T90_DEPTH)

    # F5_s91 → F5_t92 (revolve, cut)
    with BuildSketch(Plane(origin=(-6.2428858846, -31.6924679414, 43), x_dir=(-0.0125609888, 0.9999211077, 0), z_dir=(0.9999211077, 0.0125609888, 0))):
        with BuildLine():
            ThreePointArc((0, -2), (2, 0), (0, 2))
            Line((0, 2), (0, -2))
        make_face()
    revolve(axis=Axis((-6.2428858846, -31.6924679414, 43), (0, 0, 1)), mode=Mode.SUBTRACT)


with BuildPart() as f1_12:
    add(f1_11.part)

    # F5_t87: cut F5_tool88
    add(f5_tool88.part, mode=Mode.SUBTRACT)


with BuildPart() as f5_tool94:
    # F5_s95 → F5_t96 (new body)
    with BuildSketch(Plane.XY.offset(2)):
        Polygon((-12.0627931715, -29.6503726985), (-12.7249750969, -31.5375703823), (-13.3636286482, -31.3134789467), (-13.7349453155, -30.7475997522), align=None)
    extrude(amount=-F5_T96_DEPTH)

    # F5_s97 → F5_t98 (revolve, cut)
    with BuildSketch(Plane(origin=(-12.0627931715, -29.6503726985, 2), x_dir=(0.6160950182, 0.7876718406, 0), z_dir=(-0.7876718406, 0.6160950182, 0))):
        with BuildLine():
            ThreePointArc((0, -2), (2, 0), (0, 2))
            Line((0, 2), (0, -2))
        make_face()
    revolve(axis=Axis((-12.0627931715, -29.6503726985, 2), (0, 0, -1)), mode=Mode.SUBTRACT)


with BuildPart() as f1_13:
    add(f1_12.part)

    # F5_t93: cut F5_tool94
    add(f5_tool94.part, mode=Mode.SUBTRACT)


with BuildPart() as f5_tool100:
    # F5_s101 → F5_t102 (new body)
    with BuildSketch(Plane.XY.offset(43)):
        Polygon((-12.0627931715, -29.6503726985), (-13.7349453155, -30.7475997522), (-13.3636286482, -31.3134789467), (-12.7249750969, -31.5375703823), align=None)
    extrude(amount=F5_T102_DEPTH)

    # F5_s103 → F5_t104 (revolve, cut)
    with BuildSketch(Plane(origin=(-12.0627931715, -29.6503726985, 43), x_dir=(0.6160950182, 0.7876718406, 0), z_dir=(0.7876718406, -0.6160950182, 0))):
        with BuildLine():
            ThreePointArc((0, -2), (2, 0), (0, 2))
            Line((0, 2), (0, -2))
        make_face()
    revolve(axis=Axis((-12.0627931715, -29.6503726985, 43), (0, 0, 1)), mode=Mode.SUBTRACT)


with BuildPart() as f1_14:
    add(f1_13.part)

    # F5_t99: cut F5_tool100
    add(f5_tool100.part, mode=Mode.SUBTRACT)


with BuildPart() as f5_tool106:
    # F5_s107 → F5_t108 (new body)
    with BuildSketch(Plane.XY.offset(2)):
        Polygon((-31.5081597495, -0.0160219017), (-33.1655302123, 1.1034079304), (-33.9107997715, 0), (-33.1803118935, -1.1132489554), align=None)
    extrude(amount=-F5_T108_DEPTH)

    # F5_s109 → F5_t110 (revolve, cut)
    with BuildSketch(Plane(origin=(-31.5081597495, -0.0160219017, 2), x_dir=(0.9999777666, -0.0066683088, 0), z_dir=(0.0066683088, 0.9999777666, 0))):
        with BuildLine():
            ThreePointArc((0, -2), (2, 0), (0, 2))
            Line((0, 2), (0, -2))
        make_face()
    revolve(axis=Axis((-31.5081597495, -0.0160219017, 2), (0, 0, -1)), mode=Mode.SUBTRACT)


with BuildPart() as f1_15:
    add(f1_14.part)

    # F5_t105: cut F5_tool106
    add(f5_tool106.part, mode=Mode.SUBTRACT)


with BuildPart() as f5_tool112:
    # F5_s113 → F5_t114 (new body)
    with BuildSketch(Plane.XY.offset(43)):
        Polygon((-31.5081597495, -0.0160219017), (-33.1803118935, -1.1132489554), (-33.9107997715, 0), (-33.1655302123, 1.1034079304), align=None)
    extrude(amount=F5_T114_DEPTH)

    # F5_s115 → F5_t116 (revolve, cut)
    with BuildSketch(Plane(origin=(-31.5081597495, -0.0160219017, 43), x_dir=(0.9999777666, -0.0066683088, 0), z_dir=(-0.0066683088, -0.9999777666, 0))):
        with BuildLine():
            ThreePointArc((0, -2), (2, 0), (0, 2))
            Line((0, 2), (0, -2))
        make_face()
    revolve(axis=Axis((-31.5081597495, -0.0160219017, 43), (0, 0, 1)), mode=Mode.SUBTRACT)


with BuildPart() as f1_16:
    add(f1_15.part)

    # F5_t111: cut F5_tool112
    add(f5_tool112.part, mode=Mode.SUBTRACT)


with BuildPart() as f5_tool118:
    # F5_s119 → F5_t120 (new body)
    with BuildSketch(Plane.XY.offset(2)):
        Polygon((-14.0692030808, 25.8032039719), (-15.7265735436, 26.922633804), (-15.5701944605, 27.1541606635), (-15.3563537075, 27.3339695529), align=None)
    extrude(amount=-F5_T120_DEPTH)

    # F5_s121 → F5_t122 (revolve, cut)
    with BuildSketch(Plane(origin=(-14.0692030808, 25.8032039719, 2), x_dir=(0.7432782767, -0.6689823641, 0), z_dir=(0.6689823641, 0.7432782767, 0))):
        with BuildLine():
            ThreePointArc((0, -2), (2, 0), (0, 2))
            Line((0, 2), (0, -2))
        make_face()
    revolve(axis=Axis((-14.0692030808, 25.8032039719, 2), (0, 0, -1)), mode=Mode.SUBTRACT)


with BuildPart() as f1_17:
    add(f1_16.part)

    # F5_t117: cut F5_tool118
    add(f5_tool118.part, mode=Mode.SUBTRACT)


with BuildPart() as f5_tool124:
    # F5_s125 → F5_t126 (new body)
    with BuildSketch(Plane.XY.offset(43)):
        Polygon((-14.0692030808, 25.8032039719), (-15.7265735436, 26.922633804), (-15.5701944605, 27.1541606635), (-15.3563537075, 27.3339695529), align=None)
    extrude(amount=F5_T126_DEPTH)

    # F5_s127 → F5_t128 (revolve, cut)
    with BuildSketch(Plane(origin=(-14.0692030808, 25.8032039719, 43), x_dir=(0.7432782767, -0.6689823641, 0), z_dir=(-0.6689823641, -0.7432782767, 0))):
        with BuildLine():
            ThreePointArc((0, -2), (2, 0), (0, 2))
            Line((0, 2), (0, -2))
        make_face()
    revolve(axis=Axis((-14.0692030808, 25.8032039719, 43), (0, 0, 1)), mode=Mode.SUBTRACT)


with BuildPart() as f1_18:
    add(f1_17.part)

    # F5_t123: cut F5_tool124
    add(f5_tool124.part, mode=Mode.SUBTRACT)

    # F6 (on face) → F7 (cut, through all)
    with BuildSketch(Plane.XY.offset(45)):
        Circle(F6_R)
    extrude(amount=-F7_DEPTH, mode=Mode.SUBTRACT)


solid = f1_18.part
